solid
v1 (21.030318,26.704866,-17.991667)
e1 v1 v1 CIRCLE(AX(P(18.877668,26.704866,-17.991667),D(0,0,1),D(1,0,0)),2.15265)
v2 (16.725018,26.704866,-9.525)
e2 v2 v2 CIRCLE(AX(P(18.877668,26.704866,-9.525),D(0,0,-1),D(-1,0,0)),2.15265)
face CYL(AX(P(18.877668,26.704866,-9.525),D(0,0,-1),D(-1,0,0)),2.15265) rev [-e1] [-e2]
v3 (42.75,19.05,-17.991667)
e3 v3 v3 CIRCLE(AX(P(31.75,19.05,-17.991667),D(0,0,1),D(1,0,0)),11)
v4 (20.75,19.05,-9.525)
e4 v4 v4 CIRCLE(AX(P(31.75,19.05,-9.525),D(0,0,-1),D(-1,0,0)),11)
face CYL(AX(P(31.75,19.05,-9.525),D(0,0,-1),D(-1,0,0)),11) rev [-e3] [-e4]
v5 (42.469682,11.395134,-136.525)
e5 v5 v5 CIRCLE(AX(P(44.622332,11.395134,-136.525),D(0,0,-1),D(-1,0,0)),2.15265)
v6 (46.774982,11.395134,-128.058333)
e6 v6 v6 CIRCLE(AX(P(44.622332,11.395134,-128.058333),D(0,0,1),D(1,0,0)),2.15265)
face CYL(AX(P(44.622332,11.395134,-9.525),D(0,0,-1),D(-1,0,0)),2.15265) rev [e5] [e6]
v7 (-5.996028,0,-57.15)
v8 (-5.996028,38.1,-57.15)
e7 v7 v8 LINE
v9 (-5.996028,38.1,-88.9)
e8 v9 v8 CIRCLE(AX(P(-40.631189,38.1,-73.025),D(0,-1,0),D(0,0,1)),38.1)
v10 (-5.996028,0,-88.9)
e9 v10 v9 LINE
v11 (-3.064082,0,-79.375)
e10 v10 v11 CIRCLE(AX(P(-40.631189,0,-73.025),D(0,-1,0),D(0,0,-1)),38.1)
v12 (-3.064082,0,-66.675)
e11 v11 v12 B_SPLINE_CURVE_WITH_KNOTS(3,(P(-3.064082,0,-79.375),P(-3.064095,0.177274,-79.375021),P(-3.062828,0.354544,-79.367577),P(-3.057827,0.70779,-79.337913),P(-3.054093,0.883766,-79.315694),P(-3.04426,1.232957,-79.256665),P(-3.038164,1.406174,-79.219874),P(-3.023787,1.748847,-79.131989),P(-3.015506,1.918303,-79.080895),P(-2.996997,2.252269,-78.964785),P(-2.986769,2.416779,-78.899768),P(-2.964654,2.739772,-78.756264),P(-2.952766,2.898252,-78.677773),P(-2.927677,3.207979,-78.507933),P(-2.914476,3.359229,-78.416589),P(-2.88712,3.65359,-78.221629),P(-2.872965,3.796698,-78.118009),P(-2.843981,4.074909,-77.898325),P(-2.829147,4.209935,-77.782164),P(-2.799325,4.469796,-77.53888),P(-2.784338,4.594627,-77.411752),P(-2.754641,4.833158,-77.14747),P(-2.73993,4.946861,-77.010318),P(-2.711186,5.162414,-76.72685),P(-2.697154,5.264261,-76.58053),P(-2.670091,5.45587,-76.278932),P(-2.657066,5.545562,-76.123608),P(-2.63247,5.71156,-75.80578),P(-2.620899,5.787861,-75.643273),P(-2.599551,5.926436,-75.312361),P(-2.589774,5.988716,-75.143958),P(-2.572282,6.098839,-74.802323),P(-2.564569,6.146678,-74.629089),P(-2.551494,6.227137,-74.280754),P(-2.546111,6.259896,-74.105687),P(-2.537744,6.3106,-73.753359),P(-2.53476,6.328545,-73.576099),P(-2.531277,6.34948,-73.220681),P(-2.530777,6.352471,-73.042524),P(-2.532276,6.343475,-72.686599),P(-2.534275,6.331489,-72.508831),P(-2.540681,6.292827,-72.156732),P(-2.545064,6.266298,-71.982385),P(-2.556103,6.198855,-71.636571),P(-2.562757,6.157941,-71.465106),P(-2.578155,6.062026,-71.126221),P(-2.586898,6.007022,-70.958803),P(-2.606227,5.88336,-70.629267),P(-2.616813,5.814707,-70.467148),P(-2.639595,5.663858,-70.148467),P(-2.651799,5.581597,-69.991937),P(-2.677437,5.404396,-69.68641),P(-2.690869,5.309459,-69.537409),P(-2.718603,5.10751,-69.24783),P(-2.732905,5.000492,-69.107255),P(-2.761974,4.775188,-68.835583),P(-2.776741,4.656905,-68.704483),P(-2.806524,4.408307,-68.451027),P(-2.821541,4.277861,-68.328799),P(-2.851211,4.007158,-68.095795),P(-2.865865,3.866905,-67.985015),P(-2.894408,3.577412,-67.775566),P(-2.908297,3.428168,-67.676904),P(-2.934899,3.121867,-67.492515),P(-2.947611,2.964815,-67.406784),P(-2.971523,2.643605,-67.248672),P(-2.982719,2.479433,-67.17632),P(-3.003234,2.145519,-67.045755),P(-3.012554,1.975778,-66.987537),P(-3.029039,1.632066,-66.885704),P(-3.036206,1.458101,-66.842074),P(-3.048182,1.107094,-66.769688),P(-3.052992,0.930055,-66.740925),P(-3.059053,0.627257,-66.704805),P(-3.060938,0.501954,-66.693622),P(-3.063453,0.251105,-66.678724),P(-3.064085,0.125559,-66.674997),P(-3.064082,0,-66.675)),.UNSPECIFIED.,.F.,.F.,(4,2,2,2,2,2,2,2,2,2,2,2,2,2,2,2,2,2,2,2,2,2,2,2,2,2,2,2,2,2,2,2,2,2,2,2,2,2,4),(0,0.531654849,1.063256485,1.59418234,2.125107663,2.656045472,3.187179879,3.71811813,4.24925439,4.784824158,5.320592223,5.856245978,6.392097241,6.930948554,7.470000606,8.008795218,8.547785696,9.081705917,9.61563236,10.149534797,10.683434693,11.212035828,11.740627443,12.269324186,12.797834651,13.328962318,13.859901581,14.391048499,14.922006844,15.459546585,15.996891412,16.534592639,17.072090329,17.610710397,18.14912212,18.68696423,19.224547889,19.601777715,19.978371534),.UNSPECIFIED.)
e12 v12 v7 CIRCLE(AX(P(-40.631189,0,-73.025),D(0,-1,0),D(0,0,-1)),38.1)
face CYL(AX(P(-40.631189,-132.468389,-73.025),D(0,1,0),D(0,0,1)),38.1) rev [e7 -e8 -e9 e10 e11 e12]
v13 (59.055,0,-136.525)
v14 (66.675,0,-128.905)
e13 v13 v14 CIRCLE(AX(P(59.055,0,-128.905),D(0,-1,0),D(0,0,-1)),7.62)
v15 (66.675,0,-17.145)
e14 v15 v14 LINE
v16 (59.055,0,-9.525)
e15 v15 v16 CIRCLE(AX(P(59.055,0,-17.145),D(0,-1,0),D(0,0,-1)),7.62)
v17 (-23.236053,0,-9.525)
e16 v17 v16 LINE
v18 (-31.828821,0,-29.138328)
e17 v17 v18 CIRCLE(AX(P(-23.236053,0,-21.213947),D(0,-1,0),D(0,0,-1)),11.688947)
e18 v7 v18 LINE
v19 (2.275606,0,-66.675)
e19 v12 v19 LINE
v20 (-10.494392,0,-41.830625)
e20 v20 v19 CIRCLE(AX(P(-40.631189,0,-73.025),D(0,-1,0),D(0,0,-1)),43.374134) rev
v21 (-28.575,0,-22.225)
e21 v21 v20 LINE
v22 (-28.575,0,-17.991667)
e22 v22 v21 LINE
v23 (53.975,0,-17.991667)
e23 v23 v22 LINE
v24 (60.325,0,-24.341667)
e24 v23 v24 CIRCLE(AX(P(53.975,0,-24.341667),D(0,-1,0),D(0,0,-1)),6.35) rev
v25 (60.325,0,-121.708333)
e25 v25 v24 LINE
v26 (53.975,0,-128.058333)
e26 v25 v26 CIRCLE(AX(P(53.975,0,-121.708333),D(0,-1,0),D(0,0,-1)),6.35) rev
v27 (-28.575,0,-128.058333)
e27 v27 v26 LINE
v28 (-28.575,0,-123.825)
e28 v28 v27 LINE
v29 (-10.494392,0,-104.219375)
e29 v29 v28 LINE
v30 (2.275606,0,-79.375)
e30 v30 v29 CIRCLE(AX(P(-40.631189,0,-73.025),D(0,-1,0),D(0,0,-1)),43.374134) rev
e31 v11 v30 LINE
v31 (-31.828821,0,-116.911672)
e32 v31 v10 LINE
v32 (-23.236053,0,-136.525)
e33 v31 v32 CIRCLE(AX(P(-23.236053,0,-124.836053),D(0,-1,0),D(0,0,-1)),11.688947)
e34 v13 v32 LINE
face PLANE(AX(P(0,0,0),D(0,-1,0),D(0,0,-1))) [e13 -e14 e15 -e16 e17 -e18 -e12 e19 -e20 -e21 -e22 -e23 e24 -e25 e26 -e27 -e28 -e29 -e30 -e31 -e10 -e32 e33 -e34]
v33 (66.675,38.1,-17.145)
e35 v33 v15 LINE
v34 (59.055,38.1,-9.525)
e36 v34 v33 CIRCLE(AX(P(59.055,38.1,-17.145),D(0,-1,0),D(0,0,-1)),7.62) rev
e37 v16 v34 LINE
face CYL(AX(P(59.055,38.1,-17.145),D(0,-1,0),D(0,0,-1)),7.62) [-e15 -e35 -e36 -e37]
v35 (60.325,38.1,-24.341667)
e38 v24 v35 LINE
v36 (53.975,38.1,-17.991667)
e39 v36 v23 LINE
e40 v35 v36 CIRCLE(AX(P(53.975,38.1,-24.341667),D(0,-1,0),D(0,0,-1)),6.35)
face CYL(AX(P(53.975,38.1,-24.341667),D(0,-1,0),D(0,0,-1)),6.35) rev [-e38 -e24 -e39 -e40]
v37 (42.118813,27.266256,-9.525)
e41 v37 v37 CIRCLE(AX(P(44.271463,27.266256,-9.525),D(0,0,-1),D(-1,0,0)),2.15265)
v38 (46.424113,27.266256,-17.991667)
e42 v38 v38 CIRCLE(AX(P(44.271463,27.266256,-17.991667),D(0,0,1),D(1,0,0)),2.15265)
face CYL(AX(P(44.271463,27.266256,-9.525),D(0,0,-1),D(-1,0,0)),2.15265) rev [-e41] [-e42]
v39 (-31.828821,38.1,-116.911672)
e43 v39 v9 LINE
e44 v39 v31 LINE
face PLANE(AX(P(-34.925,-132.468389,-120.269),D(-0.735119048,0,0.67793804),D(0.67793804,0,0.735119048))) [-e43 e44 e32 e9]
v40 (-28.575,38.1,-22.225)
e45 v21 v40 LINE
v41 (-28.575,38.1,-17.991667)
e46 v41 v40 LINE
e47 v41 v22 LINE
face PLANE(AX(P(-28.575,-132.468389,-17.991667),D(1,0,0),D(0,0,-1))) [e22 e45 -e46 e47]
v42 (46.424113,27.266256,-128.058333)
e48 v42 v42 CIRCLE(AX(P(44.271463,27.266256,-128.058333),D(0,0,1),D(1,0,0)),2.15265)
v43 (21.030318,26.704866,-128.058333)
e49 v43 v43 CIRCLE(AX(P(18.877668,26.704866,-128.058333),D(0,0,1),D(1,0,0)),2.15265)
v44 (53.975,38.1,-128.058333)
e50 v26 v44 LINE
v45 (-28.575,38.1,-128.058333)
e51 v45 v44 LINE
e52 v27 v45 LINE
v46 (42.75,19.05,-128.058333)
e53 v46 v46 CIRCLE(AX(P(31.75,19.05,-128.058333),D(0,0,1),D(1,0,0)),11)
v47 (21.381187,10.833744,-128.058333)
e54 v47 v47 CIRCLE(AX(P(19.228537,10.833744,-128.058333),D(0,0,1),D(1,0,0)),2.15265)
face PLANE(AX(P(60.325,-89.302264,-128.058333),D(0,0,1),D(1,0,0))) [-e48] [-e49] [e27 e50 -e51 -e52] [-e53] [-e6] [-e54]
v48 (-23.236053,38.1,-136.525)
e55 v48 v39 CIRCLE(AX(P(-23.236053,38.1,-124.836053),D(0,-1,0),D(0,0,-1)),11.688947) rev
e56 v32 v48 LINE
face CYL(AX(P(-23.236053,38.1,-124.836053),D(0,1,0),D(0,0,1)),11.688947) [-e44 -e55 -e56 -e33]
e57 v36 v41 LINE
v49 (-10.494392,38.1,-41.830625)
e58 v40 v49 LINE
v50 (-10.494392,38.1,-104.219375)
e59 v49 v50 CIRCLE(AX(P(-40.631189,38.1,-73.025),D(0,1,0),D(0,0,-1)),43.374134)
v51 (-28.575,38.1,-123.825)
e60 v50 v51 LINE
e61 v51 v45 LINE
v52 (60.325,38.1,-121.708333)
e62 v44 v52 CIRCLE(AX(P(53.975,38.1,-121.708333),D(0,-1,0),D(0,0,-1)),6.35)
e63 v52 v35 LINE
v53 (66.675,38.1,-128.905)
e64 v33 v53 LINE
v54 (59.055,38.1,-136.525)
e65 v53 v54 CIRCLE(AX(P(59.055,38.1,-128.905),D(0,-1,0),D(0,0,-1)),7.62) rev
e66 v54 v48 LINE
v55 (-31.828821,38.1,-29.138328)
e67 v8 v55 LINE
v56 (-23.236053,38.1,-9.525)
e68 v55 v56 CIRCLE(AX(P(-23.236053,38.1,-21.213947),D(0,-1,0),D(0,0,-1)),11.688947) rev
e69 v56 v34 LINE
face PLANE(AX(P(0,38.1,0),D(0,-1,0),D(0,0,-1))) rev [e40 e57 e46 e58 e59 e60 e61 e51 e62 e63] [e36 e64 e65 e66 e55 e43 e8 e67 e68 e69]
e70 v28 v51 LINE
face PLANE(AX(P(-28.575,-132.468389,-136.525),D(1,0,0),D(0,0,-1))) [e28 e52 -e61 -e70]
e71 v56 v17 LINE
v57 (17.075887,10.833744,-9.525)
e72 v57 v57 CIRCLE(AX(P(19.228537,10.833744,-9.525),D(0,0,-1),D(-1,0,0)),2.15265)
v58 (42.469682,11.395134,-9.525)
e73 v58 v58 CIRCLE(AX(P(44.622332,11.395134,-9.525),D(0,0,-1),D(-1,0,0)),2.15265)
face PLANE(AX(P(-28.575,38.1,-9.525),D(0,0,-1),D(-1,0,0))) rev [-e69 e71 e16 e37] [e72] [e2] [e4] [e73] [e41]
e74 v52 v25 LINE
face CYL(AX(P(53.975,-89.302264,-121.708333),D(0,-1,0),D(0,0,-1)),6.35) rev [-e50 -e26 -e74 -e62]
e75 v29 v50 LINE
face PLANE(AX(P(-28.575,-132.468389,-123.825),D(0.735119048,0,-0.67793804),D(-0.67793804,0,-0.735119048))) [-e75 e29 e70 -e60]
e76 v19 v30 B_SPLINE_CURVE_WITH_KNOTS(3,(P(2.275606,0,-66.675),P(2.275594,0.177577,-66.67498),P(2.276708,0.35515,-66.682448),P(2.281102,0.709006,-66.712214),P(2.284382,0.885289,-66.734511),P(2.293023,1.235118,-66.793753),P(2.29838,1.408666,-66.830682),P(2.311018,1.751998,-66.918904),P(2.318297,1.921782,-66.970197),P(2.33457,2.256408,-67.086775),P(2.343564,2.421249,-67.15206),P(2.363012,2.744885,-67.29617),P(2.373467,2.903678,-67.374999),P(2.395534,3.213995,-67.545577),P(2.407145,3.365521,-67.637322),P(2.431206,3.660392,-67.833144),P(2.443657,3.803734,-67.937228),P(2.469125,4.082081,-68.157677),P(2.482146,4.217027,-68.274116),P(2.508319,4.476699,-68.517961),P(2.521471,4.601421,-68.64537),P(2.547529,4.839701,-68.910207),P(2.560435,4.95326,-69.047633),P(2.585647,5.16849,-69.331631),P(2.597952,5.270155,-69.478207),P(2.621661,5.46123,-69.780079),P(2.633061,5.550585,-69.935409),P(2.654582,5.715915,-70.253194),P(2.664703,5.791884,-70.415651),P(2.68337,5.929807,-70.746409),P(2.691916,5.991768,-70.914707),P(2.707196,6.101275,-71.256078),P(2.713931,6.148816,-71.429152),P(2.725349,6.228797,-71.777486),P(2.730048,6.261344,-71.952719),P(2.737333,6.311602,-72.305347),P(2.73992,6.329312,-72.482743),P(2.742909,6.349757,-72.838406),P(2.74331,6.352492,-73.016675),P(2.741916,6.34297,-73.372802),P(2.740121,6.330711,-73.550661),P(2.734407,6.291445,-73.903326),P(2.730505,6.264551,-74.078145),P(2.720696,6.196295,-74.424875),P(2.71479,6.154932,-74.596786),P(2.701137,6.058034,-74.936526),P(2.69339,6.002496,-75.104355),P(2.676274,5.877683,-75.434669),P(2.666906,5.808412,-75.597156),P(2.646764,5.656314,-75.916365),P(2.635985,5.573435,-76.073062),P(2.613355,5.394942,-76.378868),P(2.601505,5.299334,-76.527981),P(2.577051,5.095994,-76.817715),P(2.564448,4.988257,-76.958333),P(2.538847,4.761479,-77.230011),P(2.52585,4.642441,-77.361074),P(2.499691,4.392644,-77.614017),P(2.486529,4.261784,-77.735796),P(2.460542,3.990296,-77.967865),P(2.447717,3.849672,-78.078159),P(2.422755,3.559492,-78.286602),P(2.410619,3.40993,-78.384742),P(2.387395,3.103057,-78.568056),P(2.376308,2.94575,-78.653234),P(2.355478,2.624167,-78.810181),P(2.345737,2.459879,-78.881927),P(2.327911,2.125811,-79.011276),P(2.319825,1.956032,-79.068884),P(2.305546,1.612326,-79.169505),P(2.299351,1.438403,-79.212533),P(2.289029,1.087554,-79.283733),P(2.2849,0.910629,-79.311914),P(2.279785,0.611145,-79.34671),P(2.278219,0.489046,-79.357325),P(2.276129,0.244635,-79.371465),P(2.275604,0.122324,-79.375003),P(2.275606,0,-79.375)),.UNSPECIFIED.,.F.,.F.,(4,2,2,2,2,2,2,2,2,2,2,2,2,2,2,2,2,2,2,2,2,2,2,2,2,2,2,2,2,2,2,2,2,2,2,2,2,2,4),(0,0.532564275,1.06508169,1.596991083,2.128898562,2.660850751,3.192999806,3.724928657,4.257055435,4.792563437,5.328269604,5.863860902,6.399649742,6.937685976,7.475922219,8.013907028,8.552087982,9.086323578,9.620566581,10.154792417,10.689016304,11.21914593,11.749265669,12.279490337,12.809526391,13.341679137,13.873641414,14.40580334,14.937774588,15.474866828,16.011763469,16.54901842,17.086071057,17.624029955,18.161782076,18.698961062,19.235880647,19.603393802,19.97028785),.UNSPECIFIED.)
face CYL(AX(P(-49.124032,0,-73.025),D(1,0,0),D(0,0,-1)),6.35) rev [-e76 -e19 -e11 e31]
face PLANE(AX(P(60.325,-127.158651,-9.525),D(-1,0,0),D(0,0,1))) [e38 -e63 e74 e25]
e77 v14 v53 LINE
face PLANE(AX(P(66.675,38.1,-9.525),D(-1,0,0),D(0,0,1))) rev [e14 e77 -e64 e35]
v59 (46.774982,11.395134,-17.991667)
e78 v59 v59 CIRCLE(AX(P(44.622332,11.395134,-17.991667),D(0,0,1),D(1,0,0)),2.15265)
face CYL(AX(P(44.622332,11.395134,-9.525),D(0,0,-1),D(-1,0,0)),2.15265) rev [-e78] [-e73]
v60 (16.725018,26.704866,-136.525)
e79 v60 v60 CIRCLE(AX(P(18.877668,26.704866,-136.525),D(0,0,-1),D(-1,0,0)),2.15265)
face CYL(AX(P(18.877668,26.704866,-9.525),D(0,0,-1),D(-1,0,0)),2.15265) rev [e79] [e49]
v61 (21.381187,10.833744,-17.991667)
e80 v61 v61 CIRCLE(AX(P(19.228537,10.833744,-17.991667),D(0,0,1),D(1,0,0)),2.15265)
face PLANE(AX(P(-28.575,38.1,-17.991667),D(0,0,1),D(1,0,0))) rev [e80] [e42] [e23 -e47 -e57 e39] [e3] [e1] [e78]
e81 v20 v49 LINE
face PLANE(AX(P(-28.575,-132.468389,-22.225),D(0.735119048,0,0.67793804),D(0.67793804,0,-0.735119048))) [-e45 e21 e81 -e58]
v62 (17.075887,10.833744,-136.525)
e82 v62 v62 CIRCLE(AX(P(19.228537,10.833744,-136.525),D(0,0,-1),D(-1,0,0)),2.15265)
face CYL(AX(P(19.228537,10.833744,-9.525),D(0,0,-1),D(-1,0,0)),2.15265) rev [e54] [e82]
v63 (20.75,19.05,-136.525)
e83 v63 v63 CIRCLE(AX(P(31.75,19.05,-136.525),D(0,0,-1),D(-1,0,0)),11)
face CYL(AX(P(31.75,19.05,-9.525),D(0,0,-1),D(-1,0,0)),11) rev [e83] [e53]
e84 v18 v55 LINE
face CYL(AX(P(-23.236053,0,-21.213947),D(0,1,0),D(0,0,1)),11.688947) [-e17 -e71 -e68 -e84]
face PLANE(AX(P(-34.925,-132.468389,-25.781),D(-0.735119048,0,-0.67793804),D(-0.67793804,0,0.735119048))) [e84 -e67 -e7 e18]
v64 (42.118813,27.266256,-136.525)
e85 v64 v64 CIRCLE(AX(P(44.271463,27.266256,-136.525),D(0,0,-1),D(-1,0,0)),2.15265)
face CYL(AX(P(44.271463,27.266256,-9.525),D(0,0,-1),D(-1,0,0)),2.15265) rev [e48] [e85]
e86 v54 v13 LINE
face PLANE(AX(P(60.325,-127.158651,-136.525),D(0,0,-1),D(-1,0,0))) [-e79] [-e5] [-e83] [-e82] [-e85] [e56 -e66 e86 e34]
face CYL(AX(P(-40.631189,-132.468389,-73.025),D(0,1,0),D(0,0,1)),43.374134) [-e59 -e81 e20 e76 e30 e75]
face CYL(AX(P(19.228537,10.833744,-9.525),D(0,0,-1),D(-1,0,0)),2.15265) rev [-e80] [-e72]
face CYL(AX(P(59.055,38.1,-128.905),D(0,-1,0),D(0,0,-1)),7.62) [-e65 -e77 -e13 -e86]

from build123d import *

# Parameters (mm, degrees)
SKETCH1_W               = 95.25
SKETCH1_H               = 8.466666667
BOSS_EXTRUDE1_DEPTH     = 38.1
SKETCH2_W               = 6.35
SKETCH2_H               = 127
BOSS_EXTRUDE2_DEPTH     = 38.1
SKETCH3_W               = 88.9
SKETCH3_H               = 8.466666667
BOSS_EXTRUDE3_DEPTH     = 38.1
SKETCH4_R               = 11
CUT_EXTRUDE1_DEPTH      = 149.412147835
SKETCH5_R               = 2.15265
CUT_EXTRUDE2_DEPTH      = 149.412147835
FILLET1_R               = 7.62
BOSS_EXTRUDE4_DEPTH     = 38.1
CUT_EXTRUDE8_REACH      = 172.773
CUT_EXTRUDE8_END_RADIUS = 38.1
FILLET2_R               = 11.688947
FILLET3_R               = 11.688947
FILLET4_R               = 6.35


with BuildPart() as part:
    # Sketch1 → Boss-Extrude1 (new body)
    with BuildSketch(Plane(origin=(0, 0, 0), x_dir=(1, 0, 0), z_dir=(0, 1, 0))):
        with Locations((19.05, 13.758333334)):
            Rectangle(SKETCH1_W, SKETCH1_H)
    extrude(amount=BOSS_EXTRUDE1_DEPTH)

    # Sketch2 → Boss-Extrude2 (add)
    with BuildSketch(Plane(origin=(0, 38.1, 0), x_dir=(1, 0, 0), z_dir=(0, 1, 0))):
        with Locations((63.5, 73.025)):
            Rectangle(SKETCH2_W, SKETCH2_H)
    extrude(amount=-BOSS_EXTRUDE2_DEPTH)

    # Sketch3 → Boss-Extrude3 (add)
    with BuildSketch(Plane(origin=(0, 38.1, 0), x_dir=(1, 0, 0), z_dir=(0, 1, 0))):
        with Locations((15.875, 132.291666667)):
            Rectangle(SKETCH3_W, SKETCH3_H)
    extrude(amount=-BOSS_EXTRUDE3_DEPTH)

    # Sketch4 → Cut-Extrude1 (cut, through all)
    with BuildSketch(Plane(origin=(0, 0, -136.525), x_dir=(-1, 0, 0), z_dir=(0, 0, -1))):
        with Locations((-31.75, 19.05)):
            Circle(SKETCH4_R)
    extrude(amount=-CUT_EXTRUDE1_DEPTH, mode=Mode.SUBTRACT)

    # Sketch5 → Cut-Extrude2 (cut, through all)
    with BuildSketch(Plane(origin=(0, 0, -136.525), x_dir=(-1, 0, 0), z_dir=(0, 0, -1))):
        with Locations((-18.877667779, 26.704865736)):
            Circle(SKETCH5_R)
        with Locations((-19.228536904, 10.833743663)):
            Circle(SKETCH5_R)
        with Locations((-44.622332221, 11.395134264)):
            Circle(SKETCH5_R)
        with Locations((-44.271463096, 27.266256337)):
            Circle(SKETCH5_R)
    extrude(amount=-CUT_EXTRUDE2_DEPTH, mode=Mode.SUBTRACT)

    # Fillet1
    fillet1_edges = [part.edges().sort_by_distance(p)[0] for p in [
        (66.675, 19.05, -136.525),
        (66.675, 19.05, -9.525),
    ]]
    fillet(fillet1_edges, radius=FILLET1_R)

    # Sketch10 → Boss-Extrude4 (add)
    with BuildSketch(Plane(origin=(0, 38.1, 0), x_dir=(1, 0, 0), z_dir=(0, 1, 0))):
        with BuildLine():
            Line((-28.575, 17.991666667), (-28.575, 9.525))
            Line((-28.575, 9.525), (-34.925, 9.525))
            Line((-34.925, 9.525), (-34.925, 25.781))
            Line((-34.925, 25.781), (-5.996027965, 57.15))
            ThreePointArc((-5.996027965, 57.15), (-2.531188929, 73.025), (-5.996027965, 88.9))
            Line((-5.996027965, 88.9), (-34.925, 120.269))
            Line((-34.925, 120.269), (-34.925, 136.525))
            Line((-34.925, 136.525), (-28.575, 136.525))
            Line((-28.575, 136.525), (-28.575, 123.825))
            Line((-28.575, 123.825), (-10.494392478, 104.219375))
            ThreePointArc((-10.494392478, 104.219375), (2.742945437, 73.025), (-10.494392478, 41.830625))
            Line((-10.494392478, 41.830625), (-28.575, 22.225))
            Line((-28.575, 22.225), (-28.575, 17.991666667))
        make_face()
    extrude(amount=-BOSS_EXTRUDE4_DEPTH)

    # Cut-Extrude8: up to this cylinder (the profile starts outside it)
    cut_extrude8_end = Plane(origin=(-40.631188929, 2.695024, -73.025), z_dir=(0, 1, 0)) * Cylinder(CUT_EXTRUDE8_END_RADIUS, 422.746, mode=Mode.PRIVATE)
    # Sketch12 → Cut-Extrude8 (cut, up to the surface)
    with BuildSketch(Plane.ZY.offset(-60.325), mode=Mode.PRIVATE) as cut_extrude8_sk1:
        with BuildLine():
            Line((-79.375, 0), (-66.675, 0))
            ThreePointArc((-66.675, 0), (-73.025, 6.35), (-79.375, 0))
        make_face()
    cut_extrude8_tool1 = extrude(cut_extrude8_sk1.sketch, amount=CUT_EXTRUDE8_REACH, mode=Mode.PRIVATE) - cut_extrude8_end
    add(cut_extrude8_tool1.solids().sort_by_distance((60.325, 2.695024, -73.025))[0], mode=Mode.SUBTRACT)

    # Fillet2
    fillet2_edges = [part.edges().sort_by_distance(p)[0] for p in [
        (-34.925, 19.05, -136.525),
        (-34.925, 19.05, -120.269),
    ]]
    fillet(fillet2_edges, radius=FILLET2_R - 0.0001)  # a hair under: the kernel refuses the full size

    # Fillet3
    fillet3_edges = [part.edges().sort_by_distance(p)[0] for p in [
        (-34.925, 19.05, -25.781),
        (-34.925, 19.05, -9.525),
    ]]
    fillet(fillet3_edges, radius=FILLET3_R - 0.0001)  # a hair under: the kernel refuses the full size

    # Fillet4
    fillet4_edges = [part.edges().sort_by_distance(p)[0] for p in [
        (60.325, 19.05, -17.991666667),
        (60.325, 19.05, -128.058333333),
    ]]
    fillet(fillet4_edges, radius=FILLET4_R)


solid = part.part
